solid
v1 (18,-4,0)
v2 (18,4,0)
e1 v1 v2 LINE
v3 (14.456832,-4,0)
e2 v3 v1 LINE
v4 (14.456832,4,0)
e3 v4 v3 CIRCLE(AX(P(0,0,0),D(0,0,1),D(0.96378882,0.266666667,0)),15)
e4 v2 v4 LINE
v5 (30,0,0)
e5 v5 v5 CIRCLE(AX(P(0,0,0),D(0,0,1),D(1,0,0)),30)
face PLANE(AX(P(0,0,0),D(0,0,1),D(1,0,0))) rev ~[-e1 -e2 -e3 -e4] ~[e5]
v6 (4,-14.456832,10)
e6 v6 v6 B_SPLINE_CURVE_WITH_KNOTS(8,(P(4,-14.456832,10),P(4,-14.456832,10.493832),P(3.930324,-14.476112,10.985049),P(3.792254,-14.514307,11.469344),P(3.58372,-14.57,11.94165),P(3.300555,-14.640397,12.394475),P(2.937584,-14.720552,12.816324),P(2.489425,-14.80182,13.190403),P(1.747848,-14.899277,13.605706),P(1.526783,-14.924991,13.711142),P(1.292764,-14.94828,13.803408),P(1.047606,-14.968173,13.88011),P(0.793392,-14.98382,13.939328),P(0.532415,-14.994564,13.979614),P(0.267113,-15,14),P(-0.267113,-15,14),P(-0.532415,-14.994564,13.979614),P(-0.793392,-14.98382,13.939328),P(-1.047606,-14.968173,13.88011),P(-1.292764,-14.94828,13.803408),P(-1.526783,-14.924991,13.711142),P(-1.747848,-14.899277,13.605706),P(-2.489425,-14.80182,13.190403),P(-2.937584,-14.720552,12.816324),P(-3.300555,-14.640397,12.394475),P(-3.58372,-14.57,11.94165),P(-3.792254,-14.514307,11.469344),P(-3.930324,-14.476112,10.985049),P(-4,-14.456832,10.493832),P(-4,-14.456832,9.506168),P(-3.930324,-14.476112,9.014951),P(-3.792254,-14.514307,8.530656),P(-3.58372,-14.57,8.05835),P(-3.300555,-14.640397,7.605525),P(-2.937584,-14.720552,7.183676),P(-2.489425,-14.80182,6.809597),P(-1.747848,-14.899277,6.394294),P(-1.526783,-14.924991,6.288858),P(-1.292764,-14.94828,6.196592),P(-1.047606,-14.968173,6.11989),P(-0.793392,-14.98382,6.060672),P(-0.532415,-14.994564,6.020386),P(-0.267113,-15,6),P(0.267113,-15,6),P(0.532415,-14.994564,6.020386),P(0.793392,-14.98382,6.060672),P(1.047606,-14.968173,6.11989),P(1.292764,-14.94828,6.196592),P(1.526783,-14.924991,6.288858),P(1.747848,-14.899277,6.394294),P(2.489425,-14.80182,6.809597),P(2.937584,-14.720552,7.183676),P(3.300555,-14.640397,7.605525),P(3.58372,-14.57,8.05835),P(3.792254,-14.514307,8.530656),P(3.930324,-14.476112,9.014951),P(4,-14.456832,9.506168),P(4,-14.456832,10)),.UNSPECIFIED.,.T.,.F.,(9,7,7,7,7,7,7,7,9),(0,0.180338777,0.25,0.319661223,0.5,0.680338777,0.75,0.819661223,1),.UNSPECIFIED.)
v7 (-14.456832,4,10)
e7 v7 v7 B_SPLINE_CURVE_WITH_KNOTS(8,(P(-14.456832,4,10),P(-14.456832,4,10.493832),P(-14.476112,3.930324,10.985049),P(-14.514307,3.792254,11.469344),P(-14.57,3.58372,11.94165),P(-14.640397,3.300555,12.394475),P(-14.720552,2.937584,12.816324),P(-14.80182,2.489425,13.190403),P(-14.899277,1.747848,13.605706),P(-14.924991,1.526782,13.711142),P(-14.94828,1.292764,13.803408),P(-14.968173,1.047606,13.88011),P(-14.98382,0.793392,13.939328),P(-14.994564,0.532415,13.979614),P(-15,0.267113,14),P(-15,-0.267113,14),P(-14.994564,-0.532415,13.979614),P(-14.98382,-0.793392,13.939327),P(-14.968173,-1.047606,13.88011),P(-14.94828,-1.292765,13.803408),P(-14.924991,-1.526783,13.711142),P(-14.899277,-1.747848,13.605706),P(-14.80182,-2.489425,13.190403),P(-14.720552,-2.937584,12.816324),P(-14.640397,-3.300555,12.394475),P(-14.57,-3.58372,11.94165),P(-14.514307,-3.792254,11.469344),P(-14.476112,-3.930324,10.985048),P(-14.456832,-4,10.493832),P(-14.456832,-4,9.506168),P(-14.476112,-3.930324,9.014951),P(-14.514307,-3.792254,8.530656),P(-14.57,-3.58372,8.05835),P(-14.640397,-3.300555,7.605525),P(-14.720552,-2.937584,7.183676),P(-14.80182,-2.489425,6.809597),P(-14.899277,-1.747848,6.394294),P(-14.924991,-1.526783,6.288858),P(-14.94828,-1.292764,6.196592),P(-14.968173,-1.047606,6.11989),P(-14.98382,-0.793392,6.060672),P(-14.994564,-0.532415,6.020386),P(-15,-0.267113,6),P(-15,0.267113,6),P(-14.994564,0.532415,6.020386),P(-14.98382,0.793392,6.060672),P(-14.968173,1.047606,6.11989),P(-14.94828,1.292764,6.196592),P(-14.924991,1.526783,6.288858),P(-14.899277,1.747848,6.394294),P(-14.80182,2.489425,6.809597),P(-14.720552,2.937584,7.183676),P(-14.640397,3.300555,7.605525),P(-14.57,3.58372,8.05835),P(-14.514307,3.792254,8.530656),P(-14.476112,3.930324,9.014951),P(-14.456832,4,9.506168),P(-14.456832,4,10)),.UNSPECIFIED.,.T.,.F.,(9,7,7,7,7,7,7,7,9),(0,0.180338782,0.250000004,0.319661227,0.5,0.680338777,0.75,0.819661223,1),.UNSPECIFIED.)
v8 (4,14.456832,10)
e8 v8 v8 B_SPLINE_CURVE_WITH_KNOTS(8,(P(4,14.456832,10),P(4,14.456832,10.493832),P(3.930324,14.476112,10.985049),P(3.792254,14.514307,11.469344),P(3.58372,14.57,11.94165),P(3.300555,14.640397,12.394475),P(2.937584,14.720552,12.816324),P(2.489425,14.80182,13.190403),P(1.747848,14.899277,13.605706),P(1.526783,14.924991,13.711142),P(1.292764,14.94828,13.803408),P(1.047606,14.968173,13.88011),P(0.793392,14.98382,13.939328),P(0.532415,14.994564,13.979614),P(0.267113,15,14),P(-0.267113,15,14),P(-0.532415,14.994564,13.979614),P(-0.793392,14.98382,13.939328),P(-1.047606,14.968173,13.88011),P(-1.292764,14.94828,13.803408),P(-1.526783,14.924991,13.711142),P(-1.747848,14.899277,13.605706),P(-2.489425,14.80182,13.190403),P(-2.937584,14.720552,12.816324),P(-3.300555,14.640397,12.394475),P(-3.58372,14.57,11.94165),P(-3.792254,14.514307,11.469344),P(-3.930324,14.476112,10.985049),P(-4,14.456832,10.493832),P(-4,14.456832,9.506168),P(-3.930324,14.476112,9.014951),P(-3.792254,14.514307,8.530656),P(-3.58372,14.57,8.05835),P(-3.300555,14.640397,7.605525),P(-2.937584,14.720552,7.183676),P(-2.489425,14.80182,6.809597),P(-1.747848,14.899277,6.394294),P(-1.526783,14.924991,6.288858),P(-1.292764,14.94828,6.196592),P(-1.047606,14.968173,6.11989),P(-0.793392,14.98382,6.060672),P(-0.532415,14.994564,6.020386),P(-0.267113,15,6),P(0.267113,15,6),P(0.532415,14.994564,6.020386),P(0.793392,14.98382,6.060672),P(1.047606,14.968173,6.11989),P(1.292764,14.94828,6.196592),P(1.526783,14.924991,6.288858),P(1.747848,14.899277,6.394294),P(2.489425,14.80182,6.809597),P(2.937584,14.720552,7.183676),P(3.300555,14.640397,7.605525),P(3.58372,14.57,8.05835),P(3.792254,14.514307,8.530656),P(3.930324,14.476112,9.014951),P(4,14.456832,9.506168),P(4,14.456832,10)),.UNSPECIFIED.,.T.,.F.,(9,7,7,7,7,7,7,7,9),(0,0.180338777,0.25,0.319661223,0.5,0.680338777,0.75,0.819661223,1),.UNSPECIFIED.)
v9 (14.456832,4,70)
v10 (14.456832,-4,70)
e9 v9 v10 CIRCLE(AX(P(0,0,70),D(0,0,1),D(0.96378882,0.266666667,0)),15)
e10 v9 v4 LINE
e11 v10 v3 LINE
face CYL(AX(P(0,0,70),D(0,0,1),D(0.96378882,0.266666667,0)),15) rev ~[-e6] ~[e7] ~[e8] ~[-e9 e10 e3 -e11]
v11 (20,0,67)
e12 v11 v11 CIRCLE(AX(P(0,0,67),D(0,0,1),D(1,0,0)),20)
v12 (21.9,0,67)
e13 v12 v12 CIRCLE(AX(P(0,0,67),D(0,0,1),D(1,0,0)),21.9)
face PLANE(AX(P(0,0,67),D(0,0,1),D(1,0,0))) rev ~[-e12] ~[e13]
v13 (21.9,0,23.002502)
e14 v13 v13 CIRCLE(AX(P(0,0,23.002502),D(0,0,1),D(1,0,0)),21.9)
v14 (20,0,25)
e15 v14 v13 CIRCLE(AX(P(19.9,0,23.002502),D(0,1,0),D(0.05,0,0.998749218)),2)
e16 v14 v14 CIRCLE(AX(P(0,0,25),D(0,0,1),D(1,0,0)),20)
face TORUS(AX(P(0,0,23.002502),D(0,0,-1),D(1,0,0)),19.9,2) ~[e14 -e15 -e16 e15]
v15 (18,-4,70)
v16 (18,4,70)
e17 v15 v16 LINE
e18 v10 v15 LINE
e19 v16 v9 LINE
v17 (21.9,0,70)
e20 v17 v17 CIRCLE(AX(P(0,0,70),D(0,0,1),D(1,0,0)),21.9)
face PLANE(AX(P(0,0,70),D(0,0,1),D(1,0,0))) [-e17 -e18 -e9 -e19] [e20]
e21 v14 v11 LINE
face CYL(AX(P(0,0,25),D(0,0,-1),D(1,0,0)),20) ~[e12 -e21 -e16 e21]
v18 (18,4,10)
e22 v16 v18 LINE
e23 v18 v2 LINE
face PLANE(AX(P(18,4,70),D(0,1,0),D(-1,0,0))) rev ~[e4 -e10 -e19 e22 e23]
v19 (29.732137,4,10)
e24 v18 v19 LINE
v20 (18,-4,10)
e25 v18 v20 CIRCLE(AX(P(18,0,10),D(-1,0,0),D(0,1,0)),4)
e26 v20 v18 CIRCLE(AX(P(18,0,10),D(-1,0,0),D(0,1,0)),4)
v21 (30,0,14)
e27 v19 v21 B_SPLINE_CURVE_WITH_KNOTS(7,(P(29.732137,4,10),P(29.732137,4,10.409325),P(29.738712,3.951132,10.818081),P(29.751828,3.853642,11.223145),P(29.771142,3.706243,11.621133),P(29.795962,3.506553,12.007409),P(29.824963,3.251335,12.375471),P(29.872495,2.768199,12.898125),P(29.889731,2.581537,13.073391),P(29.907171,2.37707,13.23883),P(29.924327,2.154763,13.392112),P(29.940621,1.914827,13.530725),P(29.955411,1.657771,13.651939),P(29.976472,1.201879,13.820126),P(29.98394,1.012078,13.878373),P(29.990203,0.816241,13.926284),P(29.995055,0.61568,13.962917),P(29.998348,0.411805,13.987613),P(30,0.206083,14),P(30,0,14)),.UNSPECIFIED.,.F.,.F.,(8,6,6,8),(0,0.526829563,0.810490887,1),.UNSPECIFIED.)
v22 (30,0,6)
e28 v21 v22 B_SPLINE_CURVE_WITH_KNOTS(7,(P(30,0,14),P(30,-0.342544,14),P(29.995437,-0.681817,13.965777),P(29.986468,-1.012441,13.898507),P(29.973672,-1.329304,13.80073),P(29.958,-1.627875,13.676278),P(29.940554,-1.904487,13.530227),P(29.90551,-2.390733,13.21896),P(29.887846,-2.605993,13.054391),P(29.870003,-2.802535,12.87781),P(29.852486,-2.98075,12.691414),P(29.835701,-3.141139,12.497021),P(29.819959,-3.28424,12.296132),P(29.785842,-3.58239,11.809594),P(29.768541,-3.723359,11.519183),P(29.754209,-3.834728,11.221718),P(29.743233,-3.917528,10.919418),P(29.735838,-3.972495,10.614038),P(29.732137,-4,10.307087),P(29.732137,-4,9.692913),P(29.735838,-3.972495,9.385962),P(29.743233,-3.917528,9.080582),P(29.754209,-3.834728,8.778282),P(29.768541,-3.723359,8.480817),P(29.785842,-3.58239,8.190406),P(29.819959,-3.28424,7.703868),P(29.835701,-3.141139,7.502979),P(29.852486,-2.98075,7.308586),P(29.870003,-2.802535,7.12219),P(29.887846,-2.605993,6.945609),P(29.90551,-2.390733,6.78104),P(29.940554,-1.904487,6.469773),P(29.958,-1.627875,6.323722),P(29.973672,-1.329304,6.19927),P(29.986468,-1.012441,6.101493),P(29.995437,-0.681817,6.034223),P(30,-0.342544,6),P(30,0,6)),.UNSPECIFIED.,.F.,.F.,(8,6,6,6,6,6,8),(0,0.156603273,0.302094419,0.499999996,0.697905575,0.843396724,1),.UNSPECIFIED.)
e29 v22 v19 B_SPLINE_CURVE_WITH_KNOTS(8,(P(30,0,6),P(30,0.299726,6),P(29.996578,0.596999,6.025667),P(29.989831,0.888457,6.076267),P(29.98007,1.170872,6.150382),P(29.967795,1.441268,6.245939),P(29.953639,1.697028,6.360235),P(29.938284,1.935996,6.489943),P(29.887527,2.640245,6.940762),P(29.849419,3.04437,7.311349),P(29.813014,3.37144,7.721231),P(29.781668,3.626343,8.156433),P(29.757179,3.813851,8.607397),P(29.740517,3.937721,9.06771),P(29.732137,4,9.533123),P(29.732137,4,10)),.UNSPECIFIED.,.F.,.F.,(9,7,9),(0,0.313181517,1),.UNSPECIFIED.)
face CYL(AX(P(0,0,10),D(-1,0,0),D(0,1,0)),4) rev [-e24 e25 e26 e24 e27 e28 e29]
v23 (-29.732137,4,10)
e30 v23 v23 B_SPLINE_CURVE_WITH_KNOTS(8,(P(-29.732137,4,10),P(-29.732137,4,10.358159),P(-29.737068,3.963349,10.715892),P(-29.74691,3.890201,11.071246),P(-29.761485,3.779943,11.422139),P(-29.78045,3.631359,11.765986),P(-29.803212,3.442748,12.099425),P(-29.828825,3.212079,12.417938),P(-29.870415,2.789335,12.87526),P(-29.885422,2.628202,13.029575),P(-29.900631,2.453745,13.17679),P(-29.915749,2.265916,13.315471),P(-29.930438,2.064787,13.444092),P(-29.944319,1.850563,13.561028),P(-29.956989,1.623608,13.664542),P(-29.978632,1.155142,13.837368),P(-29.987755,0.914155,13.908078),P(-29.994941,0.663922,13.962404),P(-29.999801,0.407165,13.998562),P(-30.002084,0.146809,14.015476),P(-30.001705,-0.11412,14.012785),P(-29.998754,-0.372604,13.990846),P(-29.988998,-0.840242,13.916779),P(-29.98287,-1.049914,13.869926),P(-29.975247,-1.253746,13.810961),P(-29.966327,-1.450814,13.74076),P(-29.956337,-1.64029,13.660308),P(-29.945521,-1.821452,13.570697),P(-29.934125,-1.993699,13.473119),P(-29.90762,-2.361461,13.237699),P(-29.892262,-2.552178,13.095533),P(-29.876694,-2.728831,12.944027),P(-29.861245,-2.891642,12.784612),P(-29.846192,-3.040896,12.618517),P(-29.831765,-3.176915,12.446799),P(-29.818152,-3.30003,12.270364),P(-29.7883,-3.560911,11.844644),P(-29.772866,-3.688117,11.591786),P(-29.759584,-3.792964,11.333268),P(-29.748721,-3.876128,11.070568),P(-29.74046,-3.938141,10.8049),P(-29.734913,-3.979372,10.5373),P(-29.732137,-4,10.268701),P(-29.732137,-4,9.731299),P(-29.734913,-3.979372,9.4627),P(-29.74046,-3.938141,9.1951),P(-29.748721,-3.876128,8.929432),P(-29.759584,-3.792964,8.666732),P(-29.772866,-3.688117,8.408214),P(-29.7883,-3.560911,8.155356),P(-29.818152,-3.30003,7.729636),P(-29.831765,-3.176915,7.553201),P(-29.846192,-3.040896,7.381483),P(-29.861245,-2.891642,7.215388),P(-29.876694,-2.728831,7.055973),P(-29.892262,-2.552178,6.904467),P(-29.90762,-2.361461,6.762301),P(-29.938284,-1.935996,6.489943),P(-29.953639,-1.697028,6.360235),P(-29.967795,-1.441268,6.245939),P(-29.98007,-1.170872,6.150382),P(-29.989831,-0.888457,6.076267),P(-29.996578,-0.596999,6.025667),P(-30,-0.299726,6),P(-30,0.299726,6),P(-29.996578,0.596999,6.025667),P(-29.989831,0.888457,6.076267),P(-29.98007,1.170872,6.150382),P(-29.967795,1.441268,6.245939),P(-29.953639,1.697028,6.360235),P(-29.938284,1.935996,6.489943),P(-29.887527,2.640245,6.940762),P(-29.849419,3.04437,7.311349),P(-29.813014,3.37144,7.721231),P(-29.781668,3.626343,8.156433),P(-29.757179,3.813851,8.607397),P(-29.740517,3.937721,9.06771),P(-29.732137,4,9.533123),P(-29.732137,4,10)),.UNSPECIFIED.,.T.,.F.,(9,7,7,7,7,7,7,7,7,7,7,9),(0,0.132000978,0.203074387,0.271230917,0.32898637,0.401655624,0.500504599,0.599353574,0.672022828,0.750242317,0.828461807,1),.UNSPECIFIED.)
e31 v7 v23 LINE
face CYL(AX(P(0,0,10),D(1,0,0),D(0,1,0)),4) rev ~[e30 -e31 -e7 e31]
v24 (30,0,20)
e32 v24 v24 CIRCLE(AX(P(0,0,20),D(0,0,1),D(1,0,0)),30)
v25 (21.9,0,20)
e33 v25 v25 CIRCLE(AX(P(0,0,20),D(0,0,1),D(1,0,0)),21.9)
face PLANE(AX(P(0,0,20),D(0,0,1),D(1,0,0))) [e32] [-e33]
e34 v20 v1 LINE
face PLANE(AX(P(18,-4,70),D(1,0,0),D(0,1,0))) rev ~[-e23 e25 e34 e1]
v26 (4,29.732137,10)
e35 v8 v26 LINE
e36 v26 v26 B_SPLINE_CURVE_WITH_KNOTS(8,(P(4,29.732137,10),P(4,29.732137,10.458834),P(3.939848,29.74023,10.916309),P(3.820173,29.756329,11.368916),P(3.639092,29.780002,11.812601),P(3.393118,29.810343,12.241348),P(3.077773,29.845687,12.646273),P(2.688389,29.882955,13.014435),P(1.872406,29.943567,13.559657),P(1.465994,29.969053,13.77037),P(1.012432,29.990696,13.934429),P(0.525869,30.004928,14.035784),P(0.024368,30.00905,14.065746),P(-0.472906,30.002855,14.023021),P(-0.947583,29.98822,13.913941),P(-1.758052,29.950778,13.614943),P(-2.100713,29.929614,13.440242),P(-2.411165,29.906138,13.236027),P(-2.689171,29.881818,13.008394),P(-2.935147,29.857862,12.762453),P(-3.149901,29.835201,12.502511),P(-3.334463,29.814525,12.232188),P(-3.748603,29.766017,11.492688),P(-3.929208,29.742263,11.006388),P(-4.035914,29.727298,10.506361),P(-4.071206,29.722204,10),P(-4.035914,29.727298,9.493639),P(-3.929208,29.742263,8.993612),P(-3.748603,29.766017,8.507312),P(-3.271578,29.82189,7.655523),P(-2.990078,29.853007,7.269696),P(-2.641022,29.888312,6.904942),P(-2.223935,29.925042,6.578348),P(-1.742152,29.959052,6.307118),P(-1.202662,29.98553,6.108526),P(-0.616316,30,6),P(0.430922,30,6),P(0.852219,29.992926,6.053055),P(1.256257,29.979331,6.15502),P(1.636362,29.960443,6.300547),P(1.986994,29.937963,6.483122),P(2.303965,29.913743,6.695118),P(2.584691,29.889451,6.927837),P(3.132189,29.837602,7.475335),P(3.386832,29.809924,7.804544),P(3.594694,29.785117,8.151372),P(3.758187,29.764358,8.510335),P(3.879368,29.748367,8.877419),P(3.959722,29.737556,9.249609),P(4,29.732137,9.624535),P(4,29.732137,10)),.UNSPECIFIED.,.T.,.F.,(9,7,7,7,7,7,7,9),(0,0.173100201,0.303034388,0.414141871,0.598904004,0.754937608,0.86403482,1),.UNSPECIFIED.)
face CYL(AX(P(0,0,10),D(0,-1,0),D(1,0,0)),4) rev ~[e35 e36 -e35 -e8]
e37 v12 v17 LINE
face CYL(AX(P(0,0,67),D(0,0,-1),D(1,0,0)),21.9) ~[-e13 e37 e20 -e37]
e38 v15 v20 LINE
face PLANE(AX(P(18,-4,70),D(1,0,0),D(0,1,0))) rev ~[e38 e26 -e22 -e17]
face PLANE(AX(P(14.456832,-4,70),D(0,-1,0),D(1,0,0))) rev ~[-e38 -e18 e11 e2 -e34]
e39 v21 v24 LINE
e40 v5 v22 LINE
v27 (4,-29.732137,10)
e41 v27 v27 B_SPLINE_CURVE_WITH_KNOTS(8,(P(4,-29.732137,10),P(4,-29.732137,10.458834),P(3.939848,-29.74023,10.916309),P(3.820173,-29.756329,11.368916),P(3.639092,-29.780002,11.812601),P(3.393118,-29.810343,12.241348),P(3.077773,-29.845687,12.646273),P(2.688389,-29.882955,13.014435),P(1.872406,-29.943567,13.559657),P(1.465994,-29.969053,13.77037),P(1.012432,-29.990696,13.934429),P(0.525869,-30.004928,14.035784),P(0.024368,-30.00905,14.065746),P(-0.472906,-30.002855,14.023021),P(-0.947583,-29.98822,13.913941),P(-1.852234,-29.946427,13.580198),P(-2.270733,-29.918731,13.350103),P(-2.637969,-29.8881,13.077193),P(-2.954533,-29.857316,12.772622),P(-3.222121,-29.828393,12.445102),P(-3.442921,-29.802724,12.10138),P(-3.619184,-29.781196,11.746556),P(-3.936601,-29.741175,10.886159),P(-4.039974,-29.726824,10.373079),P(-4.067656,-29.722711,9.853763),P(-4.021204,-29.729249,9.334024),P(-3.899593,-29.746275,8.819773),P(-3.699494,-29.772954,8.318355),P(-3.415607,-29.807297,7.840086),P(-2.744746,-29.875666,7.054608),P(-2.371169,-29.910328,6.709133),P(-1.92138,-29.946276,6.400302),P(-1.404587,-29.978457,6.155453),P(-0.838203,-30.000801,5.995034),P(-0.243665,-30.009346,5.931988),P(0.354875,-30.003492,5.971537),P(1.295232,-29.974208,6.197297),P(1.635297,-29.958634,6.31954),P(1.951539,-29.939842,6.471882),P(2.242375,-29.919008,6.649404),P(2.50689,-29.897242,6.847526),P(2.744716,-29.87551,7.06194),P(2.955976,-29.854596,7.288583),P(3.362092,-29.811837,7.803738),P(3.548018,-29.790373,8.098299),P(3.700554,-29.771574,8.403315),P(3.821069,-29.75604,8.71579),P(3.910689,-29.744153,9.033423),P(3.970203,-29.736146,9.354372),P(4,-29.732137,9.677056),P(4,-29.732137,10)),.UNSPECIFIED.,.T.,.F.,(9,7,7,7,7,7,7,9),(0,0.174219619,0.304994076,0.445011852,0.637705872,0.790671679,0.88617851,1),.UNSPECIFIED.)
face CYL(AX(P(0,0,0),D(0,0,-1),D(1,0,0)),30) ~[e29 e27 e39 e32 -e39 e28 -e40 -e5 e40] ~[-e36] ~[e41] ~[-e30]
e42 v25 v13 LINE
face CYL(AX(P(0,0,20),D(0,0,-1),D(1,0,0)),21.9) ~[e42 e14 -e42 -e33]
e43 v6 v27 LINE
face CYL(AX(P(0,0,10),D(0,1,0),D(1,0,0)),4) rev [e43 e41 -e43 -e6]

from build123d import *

# Parameters (mm, degrees)
F0_R           = 30
F1_DEPTH       = 20
F2_R           = 21.9
F3_DEPTH       = 5
F4_R           = 20
F5_DEPTH       = 42
F6_R           = 21.9
F7_DEPTH       = 3
F10_DEPTH      = 75
F11_R          = 4
F12_DEPTH      = 100
F12_DEPTH_BACK = 100
F13_R          = 4
F14_DEPTH      = 100
F14_DEPTH_BACK = 100


# Not quite as in the source:
# - a fillet or chamfer that OpenCascade refuses, or shapes differently, is made with other operations: its cross-section is extruded or revolved along the edge and cut away or added


with BuildPart() as f1:
    # F0 (on Top) → F1 (new body)
    with BuildSketch(Plane.XY):
        Circle(F0_R)
    extrude(amount=F1_DEPTH)

    # F2 (on face) → F3 (join)
    with BuildSketch(Plane.XY.offset(20)):
        Circle(F2_R)
    extrude(amount=F3_DEPTH)

    # F4 (on face) → F5 (join)
    with BuildSketch(Plane.XY.offset(25)):
        Circle(F4_R)
    extrude(amount=F5_DEPTH)

    # F6 (on face) → F7 (join)
    with BuildSketch(Plane.XY.offset(67)):
        Circle(F6_R)
    extrude(amount=F7_DEPTH)

    # F8: fillet of radius 2 on 1 edges, made by hand

    # F8_s1 → F8_t2 (revolve, cut)
    with BuildSketch(Plane.XZ):
        with BuildLine():
            ThreePointArc((20, 25), (21.3491376746, 24.3809064397), (21.9, 23.0025015645))
            Line((21.9, 23.0025015645), (21.9, 25))
            Line((21.9, 25), (20, 25))
        make_face()
    revolve(axis=Axis((0, 0, 25), (0, 0, 1)), mode=Mode.SUBTRACT)

    # F9 (on face) → F10 (cut)
    with BuildSketch(Plane.XY.offset(70)):
        with BuildLine():
            Line((18, 4), (14.4568322948, 4))
            ThreePointArc((14.4568322948, 4), (-2.0183552187, 14.8635877974), (-15, 0))
            Line((-15, 0), (0, 0))
            Line((0, 0), (15, 0))
            Line((15, 0), (18, 0))
            Line((18, 0), (18, 4))
        make_face()
        with BuildLine():
            Line((0, 0), (-15, 0))
            ThreePointArc((-15, 0), (-2.0183552187, -14.8635877974), (14.4568322948, -4))
            Line((14.4568322948, -4), (18, -4))
            Line((18, -4), (18, 0))
            Line((18, 0), (15, 0))
            Line((15, 0), (0, 0))
        make_face()
    extrude(amount=-F10_DEPTH, mode=Mode.SUBTRACT)

    # F11 (on Right) → F12 (cut, two sides)
    with BuildSketch(Plane.YZ) as f12_sk:
        with Locations((0, 10)):
            Circle(F11_R)
    extrude(amount=F12_DEPTH, mode=Mode.SUBTRACT)
    extrude(f12_sk.sketch, amount=-F12_DEPTH_BACK, mode=Mode.SUBTRACT)

    # F13 (on Front) → F14 (cut, two sides)
    with BuildSketch(Plane.XZ) as f14_sk:
        with Locations((0, 10)):
            Circle(F13_R)
    extrude(amount=-F14_DEPTH, mode=Mode.SUBTRACT)
    extrude(f14_sk.sketch, amount=F14_DEPTH_BACK, mode=Mode.SUBTRACT)


solid = f1.part
